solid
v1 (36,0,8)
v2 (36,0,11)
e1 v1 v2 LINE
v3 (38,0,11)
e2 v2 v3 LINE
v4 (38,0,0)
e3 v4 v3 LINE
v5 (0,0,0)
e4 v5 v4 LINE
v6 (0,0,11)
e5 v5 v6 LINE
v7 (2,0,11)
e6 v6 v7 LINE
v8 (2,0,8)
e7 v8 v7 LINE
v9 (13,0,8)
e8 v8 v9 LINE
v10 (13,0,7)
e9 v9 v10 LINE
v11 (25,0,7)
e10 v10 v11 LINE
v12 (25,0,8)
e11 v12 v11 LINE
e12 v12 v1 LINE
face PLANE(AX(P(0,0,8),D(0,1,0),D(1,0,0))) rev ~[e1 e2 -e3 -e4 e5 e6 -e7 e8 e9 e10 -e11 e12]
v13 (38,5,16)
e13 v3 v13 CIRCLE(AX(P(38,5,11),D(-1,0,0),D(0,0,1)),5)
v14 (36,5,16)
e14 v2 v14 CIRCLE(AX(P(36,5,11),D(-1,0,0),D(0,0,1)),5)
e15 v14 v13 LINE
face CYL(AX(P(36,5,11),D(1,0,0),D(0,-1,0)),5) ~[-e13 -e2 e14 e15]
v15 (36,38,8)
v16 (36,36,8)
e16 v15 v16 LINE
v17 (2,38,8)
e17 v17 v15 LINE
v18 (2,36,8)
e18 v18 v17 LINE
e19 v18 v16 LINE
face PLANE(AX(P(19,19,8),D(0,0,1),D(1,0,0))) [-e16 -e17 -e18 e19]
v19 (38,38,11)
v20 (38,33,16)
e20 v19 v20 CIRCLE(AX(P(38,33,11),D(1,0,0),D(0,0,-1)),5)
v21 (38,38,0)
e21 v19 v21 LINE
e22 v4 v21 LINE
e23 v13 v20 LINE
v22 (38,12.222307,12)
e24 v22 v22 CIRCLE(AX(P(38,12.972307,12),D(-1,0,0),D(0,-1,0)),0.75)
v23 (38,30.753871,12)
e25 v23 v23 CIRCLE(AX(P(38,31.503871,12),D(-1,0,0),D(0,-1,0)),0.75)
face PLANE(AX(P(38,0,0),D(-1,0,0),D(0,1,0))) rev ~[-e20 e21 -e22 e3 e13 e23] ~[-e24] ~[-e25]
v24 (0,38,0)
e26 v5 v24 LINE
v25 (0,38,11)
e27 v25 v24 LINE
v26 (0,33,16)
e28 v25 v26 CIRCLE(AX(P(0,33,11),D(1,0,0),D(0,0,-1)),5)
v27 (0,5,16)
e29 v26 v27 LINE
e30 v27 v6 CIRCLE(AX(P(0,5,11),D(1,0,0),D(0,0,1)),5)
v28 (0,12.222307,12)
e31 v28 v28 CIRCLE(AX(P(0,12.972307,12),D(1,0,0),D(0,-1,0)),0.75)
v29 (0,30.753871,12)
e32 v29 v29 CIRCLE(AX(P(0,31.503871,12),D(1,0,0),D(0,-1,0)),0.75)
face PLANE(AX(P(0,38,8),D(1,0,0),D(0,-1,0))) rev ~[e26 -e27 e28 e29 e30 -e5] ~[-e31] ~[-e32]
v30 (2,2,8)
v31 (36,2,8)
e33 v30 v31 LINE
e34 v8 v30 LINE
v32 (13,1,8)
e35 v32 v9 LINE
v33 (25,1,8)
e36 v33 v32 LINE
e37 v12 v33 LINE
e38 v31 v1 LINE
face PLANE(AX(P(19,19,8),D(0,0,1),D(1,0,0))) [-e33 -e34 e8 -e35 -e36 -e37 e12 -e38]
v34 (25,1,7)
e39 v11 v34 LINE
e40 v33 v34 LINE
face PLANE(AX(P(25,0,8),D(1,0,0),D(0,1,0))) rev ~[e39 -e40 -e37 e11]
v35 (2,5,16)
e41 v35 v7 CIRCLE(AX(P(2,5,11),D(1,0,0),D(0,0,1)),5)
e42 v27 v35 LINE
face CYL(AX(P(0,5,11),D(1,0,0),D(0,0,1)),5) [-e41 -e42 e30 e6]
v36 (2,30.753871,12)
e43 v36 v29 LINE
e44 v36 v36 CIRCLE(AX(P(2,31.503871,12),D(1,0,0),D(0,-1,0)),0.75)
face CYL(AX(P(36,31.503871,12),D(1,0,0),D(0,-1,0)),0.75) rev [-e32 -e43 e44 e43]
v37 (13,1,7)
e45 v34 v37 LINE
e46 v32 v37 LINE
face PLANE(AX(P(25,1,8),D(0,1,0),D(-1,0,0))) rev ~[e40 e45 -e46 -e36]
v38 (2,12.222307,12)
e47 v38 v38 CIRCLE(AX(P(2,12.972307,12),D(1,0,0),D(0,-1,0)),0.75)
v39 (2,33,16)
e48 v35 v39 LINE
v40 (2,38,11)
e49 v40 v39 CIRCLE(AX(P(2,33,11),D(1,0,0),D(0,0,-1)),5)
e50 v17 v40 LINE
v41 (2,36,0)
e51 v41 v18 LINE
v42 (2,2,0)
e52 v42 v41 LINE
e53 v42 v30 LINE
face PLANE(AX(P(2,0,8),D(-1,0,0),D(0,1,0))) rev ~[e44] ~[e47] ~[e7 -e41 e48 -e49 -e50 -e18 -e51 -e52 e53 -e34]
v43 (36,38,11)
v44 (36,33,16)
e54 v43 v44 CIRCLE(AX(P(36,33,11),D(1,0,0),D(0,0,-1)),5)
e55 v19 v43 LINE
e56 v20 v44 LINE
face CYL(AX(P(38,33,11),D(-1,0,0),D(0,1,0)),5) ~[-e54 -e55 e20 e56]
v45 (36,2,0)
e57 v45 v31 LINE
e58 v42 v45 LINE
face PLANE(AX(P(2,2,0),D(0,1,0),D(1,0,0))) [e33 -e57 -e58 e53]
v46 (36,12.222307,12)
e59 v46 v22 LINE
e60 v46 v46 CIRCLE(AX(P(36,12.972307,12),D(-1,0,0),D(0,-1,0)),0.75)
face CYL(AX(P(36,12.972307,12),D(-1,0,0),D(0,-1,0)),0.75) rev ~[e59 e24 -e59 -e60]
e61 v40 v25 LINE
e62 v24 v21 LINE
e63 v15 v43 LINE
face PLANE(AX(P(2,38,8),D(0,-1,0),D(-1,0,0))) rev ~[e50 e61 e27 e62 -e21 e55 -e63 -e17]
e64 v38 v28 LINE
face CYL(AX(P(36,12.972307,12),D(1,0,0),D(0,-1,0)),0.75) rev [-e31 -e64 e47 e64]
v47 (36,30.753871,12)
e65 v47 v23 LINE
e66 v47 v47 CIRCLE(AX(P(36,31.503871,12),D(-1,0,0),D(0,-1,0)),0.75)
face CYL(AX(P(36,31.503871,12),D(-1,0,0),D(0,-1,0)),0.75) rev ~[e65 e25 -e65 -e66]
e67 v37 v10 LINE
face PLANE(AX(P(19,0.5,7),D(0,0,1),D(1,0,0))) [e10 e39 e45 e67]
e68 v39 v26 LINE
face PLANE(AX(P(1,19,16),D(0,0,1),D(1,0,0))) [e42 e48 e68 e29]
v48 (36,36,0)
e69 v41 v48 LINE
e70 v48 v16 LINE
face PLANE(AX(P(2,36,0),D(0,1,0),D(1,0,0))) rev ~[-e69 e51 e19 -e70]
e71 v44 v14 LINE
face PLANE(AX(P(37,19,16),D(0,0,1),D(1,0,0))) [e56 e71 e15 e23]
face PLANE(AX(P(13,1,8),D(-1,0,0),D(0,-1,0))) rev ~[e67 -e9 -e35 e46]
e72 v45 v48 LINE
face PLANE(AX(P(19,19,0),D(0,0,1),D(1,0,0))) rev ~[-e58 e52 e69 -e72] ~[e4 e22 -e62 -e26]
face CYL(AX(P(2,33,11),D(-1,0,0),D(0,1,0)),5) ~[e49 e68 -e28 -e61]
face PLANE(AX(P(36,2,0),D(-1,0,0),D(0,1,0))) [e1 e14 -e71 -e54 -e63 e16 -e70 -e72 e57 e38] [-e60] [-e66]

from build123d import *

# Parameters (mm, degrees)
F0_W          = 38
F0_H          = 38
F0_W_2        = 34
F0_H_2        = 34
F1_DEPTH      = 8
F3_DEPTH      = 1
F5_DEPTH      = 8
F6_R          = 0.75
F7_DEPTH      = 50.7
F7_DEPTH_BACK = 53.4
F8_R          = 5


with BuildPart() as f1:
    # F0 (on Top) → F1 (new body)
    with BuildSketch(Plane.XY):
        with Locations((19, 19)):
            Rectangle(F0_W, F0_H)
        with Locations((19, 19)):
            Rectangle(F0_W_2, F0_H_2, mode=Mode.SUBTRACT)
    extrude(amount=F1_DEPTH)

    # F2 (on face) → F3 (cut)
    with BuildSketch(Plane.XY.offset(8)):
        Polygon((13, 0), (19, 0), (25, 0), (25, 1), (19, 1), (13, 1), align=None)
    extrude(amount=-F3_DEPTH, mode=Mode.SUBTRACT)

    # F4 (on face) → F5 (join)
    with BuildSketch(Plane.XY.offset(8)):
        Polygon((0, 38), (0, 0), (2, 0), (2, 2), (2, 36), (2, 38), align=None)
        Polygon((38, 38), (36, 38), (36, 36), (36, 2), (36, 0), (38, 0), align=None)
    extrude(amount=F5_DEPTH)

    # F6 (on face) → F7 (cut, two sides)
    with BuildSketch(Plane(origin=(36, 0, 0), x_dir=(0, -1, 0), z_dir=(-1, 0, 0))) as f7_sk:
        with Locations((-31.5038709193, 12)):
            Circle(F6_R)
        with Locations((-12.9723072276, 12)):
            Circle(F6_R)
    extrude(amount=-F7_DEPTH, mode=Mode.SUBTRACT)
    extrude(f7_sk.sketch, amount=F7_DEPTH_BACK, mode=Mode.SUBTRACT)

    # F8
    f8_edges = [f1.edges().sort_by_distance(p)[0] for p in [
        (1, 0, 16),
        (37, 0, 16),
        (37, 38, 16),
        (1, 38, 16),
    ]]
    fillet(f8_edges, radius=F8_R)


solid = f1.part
